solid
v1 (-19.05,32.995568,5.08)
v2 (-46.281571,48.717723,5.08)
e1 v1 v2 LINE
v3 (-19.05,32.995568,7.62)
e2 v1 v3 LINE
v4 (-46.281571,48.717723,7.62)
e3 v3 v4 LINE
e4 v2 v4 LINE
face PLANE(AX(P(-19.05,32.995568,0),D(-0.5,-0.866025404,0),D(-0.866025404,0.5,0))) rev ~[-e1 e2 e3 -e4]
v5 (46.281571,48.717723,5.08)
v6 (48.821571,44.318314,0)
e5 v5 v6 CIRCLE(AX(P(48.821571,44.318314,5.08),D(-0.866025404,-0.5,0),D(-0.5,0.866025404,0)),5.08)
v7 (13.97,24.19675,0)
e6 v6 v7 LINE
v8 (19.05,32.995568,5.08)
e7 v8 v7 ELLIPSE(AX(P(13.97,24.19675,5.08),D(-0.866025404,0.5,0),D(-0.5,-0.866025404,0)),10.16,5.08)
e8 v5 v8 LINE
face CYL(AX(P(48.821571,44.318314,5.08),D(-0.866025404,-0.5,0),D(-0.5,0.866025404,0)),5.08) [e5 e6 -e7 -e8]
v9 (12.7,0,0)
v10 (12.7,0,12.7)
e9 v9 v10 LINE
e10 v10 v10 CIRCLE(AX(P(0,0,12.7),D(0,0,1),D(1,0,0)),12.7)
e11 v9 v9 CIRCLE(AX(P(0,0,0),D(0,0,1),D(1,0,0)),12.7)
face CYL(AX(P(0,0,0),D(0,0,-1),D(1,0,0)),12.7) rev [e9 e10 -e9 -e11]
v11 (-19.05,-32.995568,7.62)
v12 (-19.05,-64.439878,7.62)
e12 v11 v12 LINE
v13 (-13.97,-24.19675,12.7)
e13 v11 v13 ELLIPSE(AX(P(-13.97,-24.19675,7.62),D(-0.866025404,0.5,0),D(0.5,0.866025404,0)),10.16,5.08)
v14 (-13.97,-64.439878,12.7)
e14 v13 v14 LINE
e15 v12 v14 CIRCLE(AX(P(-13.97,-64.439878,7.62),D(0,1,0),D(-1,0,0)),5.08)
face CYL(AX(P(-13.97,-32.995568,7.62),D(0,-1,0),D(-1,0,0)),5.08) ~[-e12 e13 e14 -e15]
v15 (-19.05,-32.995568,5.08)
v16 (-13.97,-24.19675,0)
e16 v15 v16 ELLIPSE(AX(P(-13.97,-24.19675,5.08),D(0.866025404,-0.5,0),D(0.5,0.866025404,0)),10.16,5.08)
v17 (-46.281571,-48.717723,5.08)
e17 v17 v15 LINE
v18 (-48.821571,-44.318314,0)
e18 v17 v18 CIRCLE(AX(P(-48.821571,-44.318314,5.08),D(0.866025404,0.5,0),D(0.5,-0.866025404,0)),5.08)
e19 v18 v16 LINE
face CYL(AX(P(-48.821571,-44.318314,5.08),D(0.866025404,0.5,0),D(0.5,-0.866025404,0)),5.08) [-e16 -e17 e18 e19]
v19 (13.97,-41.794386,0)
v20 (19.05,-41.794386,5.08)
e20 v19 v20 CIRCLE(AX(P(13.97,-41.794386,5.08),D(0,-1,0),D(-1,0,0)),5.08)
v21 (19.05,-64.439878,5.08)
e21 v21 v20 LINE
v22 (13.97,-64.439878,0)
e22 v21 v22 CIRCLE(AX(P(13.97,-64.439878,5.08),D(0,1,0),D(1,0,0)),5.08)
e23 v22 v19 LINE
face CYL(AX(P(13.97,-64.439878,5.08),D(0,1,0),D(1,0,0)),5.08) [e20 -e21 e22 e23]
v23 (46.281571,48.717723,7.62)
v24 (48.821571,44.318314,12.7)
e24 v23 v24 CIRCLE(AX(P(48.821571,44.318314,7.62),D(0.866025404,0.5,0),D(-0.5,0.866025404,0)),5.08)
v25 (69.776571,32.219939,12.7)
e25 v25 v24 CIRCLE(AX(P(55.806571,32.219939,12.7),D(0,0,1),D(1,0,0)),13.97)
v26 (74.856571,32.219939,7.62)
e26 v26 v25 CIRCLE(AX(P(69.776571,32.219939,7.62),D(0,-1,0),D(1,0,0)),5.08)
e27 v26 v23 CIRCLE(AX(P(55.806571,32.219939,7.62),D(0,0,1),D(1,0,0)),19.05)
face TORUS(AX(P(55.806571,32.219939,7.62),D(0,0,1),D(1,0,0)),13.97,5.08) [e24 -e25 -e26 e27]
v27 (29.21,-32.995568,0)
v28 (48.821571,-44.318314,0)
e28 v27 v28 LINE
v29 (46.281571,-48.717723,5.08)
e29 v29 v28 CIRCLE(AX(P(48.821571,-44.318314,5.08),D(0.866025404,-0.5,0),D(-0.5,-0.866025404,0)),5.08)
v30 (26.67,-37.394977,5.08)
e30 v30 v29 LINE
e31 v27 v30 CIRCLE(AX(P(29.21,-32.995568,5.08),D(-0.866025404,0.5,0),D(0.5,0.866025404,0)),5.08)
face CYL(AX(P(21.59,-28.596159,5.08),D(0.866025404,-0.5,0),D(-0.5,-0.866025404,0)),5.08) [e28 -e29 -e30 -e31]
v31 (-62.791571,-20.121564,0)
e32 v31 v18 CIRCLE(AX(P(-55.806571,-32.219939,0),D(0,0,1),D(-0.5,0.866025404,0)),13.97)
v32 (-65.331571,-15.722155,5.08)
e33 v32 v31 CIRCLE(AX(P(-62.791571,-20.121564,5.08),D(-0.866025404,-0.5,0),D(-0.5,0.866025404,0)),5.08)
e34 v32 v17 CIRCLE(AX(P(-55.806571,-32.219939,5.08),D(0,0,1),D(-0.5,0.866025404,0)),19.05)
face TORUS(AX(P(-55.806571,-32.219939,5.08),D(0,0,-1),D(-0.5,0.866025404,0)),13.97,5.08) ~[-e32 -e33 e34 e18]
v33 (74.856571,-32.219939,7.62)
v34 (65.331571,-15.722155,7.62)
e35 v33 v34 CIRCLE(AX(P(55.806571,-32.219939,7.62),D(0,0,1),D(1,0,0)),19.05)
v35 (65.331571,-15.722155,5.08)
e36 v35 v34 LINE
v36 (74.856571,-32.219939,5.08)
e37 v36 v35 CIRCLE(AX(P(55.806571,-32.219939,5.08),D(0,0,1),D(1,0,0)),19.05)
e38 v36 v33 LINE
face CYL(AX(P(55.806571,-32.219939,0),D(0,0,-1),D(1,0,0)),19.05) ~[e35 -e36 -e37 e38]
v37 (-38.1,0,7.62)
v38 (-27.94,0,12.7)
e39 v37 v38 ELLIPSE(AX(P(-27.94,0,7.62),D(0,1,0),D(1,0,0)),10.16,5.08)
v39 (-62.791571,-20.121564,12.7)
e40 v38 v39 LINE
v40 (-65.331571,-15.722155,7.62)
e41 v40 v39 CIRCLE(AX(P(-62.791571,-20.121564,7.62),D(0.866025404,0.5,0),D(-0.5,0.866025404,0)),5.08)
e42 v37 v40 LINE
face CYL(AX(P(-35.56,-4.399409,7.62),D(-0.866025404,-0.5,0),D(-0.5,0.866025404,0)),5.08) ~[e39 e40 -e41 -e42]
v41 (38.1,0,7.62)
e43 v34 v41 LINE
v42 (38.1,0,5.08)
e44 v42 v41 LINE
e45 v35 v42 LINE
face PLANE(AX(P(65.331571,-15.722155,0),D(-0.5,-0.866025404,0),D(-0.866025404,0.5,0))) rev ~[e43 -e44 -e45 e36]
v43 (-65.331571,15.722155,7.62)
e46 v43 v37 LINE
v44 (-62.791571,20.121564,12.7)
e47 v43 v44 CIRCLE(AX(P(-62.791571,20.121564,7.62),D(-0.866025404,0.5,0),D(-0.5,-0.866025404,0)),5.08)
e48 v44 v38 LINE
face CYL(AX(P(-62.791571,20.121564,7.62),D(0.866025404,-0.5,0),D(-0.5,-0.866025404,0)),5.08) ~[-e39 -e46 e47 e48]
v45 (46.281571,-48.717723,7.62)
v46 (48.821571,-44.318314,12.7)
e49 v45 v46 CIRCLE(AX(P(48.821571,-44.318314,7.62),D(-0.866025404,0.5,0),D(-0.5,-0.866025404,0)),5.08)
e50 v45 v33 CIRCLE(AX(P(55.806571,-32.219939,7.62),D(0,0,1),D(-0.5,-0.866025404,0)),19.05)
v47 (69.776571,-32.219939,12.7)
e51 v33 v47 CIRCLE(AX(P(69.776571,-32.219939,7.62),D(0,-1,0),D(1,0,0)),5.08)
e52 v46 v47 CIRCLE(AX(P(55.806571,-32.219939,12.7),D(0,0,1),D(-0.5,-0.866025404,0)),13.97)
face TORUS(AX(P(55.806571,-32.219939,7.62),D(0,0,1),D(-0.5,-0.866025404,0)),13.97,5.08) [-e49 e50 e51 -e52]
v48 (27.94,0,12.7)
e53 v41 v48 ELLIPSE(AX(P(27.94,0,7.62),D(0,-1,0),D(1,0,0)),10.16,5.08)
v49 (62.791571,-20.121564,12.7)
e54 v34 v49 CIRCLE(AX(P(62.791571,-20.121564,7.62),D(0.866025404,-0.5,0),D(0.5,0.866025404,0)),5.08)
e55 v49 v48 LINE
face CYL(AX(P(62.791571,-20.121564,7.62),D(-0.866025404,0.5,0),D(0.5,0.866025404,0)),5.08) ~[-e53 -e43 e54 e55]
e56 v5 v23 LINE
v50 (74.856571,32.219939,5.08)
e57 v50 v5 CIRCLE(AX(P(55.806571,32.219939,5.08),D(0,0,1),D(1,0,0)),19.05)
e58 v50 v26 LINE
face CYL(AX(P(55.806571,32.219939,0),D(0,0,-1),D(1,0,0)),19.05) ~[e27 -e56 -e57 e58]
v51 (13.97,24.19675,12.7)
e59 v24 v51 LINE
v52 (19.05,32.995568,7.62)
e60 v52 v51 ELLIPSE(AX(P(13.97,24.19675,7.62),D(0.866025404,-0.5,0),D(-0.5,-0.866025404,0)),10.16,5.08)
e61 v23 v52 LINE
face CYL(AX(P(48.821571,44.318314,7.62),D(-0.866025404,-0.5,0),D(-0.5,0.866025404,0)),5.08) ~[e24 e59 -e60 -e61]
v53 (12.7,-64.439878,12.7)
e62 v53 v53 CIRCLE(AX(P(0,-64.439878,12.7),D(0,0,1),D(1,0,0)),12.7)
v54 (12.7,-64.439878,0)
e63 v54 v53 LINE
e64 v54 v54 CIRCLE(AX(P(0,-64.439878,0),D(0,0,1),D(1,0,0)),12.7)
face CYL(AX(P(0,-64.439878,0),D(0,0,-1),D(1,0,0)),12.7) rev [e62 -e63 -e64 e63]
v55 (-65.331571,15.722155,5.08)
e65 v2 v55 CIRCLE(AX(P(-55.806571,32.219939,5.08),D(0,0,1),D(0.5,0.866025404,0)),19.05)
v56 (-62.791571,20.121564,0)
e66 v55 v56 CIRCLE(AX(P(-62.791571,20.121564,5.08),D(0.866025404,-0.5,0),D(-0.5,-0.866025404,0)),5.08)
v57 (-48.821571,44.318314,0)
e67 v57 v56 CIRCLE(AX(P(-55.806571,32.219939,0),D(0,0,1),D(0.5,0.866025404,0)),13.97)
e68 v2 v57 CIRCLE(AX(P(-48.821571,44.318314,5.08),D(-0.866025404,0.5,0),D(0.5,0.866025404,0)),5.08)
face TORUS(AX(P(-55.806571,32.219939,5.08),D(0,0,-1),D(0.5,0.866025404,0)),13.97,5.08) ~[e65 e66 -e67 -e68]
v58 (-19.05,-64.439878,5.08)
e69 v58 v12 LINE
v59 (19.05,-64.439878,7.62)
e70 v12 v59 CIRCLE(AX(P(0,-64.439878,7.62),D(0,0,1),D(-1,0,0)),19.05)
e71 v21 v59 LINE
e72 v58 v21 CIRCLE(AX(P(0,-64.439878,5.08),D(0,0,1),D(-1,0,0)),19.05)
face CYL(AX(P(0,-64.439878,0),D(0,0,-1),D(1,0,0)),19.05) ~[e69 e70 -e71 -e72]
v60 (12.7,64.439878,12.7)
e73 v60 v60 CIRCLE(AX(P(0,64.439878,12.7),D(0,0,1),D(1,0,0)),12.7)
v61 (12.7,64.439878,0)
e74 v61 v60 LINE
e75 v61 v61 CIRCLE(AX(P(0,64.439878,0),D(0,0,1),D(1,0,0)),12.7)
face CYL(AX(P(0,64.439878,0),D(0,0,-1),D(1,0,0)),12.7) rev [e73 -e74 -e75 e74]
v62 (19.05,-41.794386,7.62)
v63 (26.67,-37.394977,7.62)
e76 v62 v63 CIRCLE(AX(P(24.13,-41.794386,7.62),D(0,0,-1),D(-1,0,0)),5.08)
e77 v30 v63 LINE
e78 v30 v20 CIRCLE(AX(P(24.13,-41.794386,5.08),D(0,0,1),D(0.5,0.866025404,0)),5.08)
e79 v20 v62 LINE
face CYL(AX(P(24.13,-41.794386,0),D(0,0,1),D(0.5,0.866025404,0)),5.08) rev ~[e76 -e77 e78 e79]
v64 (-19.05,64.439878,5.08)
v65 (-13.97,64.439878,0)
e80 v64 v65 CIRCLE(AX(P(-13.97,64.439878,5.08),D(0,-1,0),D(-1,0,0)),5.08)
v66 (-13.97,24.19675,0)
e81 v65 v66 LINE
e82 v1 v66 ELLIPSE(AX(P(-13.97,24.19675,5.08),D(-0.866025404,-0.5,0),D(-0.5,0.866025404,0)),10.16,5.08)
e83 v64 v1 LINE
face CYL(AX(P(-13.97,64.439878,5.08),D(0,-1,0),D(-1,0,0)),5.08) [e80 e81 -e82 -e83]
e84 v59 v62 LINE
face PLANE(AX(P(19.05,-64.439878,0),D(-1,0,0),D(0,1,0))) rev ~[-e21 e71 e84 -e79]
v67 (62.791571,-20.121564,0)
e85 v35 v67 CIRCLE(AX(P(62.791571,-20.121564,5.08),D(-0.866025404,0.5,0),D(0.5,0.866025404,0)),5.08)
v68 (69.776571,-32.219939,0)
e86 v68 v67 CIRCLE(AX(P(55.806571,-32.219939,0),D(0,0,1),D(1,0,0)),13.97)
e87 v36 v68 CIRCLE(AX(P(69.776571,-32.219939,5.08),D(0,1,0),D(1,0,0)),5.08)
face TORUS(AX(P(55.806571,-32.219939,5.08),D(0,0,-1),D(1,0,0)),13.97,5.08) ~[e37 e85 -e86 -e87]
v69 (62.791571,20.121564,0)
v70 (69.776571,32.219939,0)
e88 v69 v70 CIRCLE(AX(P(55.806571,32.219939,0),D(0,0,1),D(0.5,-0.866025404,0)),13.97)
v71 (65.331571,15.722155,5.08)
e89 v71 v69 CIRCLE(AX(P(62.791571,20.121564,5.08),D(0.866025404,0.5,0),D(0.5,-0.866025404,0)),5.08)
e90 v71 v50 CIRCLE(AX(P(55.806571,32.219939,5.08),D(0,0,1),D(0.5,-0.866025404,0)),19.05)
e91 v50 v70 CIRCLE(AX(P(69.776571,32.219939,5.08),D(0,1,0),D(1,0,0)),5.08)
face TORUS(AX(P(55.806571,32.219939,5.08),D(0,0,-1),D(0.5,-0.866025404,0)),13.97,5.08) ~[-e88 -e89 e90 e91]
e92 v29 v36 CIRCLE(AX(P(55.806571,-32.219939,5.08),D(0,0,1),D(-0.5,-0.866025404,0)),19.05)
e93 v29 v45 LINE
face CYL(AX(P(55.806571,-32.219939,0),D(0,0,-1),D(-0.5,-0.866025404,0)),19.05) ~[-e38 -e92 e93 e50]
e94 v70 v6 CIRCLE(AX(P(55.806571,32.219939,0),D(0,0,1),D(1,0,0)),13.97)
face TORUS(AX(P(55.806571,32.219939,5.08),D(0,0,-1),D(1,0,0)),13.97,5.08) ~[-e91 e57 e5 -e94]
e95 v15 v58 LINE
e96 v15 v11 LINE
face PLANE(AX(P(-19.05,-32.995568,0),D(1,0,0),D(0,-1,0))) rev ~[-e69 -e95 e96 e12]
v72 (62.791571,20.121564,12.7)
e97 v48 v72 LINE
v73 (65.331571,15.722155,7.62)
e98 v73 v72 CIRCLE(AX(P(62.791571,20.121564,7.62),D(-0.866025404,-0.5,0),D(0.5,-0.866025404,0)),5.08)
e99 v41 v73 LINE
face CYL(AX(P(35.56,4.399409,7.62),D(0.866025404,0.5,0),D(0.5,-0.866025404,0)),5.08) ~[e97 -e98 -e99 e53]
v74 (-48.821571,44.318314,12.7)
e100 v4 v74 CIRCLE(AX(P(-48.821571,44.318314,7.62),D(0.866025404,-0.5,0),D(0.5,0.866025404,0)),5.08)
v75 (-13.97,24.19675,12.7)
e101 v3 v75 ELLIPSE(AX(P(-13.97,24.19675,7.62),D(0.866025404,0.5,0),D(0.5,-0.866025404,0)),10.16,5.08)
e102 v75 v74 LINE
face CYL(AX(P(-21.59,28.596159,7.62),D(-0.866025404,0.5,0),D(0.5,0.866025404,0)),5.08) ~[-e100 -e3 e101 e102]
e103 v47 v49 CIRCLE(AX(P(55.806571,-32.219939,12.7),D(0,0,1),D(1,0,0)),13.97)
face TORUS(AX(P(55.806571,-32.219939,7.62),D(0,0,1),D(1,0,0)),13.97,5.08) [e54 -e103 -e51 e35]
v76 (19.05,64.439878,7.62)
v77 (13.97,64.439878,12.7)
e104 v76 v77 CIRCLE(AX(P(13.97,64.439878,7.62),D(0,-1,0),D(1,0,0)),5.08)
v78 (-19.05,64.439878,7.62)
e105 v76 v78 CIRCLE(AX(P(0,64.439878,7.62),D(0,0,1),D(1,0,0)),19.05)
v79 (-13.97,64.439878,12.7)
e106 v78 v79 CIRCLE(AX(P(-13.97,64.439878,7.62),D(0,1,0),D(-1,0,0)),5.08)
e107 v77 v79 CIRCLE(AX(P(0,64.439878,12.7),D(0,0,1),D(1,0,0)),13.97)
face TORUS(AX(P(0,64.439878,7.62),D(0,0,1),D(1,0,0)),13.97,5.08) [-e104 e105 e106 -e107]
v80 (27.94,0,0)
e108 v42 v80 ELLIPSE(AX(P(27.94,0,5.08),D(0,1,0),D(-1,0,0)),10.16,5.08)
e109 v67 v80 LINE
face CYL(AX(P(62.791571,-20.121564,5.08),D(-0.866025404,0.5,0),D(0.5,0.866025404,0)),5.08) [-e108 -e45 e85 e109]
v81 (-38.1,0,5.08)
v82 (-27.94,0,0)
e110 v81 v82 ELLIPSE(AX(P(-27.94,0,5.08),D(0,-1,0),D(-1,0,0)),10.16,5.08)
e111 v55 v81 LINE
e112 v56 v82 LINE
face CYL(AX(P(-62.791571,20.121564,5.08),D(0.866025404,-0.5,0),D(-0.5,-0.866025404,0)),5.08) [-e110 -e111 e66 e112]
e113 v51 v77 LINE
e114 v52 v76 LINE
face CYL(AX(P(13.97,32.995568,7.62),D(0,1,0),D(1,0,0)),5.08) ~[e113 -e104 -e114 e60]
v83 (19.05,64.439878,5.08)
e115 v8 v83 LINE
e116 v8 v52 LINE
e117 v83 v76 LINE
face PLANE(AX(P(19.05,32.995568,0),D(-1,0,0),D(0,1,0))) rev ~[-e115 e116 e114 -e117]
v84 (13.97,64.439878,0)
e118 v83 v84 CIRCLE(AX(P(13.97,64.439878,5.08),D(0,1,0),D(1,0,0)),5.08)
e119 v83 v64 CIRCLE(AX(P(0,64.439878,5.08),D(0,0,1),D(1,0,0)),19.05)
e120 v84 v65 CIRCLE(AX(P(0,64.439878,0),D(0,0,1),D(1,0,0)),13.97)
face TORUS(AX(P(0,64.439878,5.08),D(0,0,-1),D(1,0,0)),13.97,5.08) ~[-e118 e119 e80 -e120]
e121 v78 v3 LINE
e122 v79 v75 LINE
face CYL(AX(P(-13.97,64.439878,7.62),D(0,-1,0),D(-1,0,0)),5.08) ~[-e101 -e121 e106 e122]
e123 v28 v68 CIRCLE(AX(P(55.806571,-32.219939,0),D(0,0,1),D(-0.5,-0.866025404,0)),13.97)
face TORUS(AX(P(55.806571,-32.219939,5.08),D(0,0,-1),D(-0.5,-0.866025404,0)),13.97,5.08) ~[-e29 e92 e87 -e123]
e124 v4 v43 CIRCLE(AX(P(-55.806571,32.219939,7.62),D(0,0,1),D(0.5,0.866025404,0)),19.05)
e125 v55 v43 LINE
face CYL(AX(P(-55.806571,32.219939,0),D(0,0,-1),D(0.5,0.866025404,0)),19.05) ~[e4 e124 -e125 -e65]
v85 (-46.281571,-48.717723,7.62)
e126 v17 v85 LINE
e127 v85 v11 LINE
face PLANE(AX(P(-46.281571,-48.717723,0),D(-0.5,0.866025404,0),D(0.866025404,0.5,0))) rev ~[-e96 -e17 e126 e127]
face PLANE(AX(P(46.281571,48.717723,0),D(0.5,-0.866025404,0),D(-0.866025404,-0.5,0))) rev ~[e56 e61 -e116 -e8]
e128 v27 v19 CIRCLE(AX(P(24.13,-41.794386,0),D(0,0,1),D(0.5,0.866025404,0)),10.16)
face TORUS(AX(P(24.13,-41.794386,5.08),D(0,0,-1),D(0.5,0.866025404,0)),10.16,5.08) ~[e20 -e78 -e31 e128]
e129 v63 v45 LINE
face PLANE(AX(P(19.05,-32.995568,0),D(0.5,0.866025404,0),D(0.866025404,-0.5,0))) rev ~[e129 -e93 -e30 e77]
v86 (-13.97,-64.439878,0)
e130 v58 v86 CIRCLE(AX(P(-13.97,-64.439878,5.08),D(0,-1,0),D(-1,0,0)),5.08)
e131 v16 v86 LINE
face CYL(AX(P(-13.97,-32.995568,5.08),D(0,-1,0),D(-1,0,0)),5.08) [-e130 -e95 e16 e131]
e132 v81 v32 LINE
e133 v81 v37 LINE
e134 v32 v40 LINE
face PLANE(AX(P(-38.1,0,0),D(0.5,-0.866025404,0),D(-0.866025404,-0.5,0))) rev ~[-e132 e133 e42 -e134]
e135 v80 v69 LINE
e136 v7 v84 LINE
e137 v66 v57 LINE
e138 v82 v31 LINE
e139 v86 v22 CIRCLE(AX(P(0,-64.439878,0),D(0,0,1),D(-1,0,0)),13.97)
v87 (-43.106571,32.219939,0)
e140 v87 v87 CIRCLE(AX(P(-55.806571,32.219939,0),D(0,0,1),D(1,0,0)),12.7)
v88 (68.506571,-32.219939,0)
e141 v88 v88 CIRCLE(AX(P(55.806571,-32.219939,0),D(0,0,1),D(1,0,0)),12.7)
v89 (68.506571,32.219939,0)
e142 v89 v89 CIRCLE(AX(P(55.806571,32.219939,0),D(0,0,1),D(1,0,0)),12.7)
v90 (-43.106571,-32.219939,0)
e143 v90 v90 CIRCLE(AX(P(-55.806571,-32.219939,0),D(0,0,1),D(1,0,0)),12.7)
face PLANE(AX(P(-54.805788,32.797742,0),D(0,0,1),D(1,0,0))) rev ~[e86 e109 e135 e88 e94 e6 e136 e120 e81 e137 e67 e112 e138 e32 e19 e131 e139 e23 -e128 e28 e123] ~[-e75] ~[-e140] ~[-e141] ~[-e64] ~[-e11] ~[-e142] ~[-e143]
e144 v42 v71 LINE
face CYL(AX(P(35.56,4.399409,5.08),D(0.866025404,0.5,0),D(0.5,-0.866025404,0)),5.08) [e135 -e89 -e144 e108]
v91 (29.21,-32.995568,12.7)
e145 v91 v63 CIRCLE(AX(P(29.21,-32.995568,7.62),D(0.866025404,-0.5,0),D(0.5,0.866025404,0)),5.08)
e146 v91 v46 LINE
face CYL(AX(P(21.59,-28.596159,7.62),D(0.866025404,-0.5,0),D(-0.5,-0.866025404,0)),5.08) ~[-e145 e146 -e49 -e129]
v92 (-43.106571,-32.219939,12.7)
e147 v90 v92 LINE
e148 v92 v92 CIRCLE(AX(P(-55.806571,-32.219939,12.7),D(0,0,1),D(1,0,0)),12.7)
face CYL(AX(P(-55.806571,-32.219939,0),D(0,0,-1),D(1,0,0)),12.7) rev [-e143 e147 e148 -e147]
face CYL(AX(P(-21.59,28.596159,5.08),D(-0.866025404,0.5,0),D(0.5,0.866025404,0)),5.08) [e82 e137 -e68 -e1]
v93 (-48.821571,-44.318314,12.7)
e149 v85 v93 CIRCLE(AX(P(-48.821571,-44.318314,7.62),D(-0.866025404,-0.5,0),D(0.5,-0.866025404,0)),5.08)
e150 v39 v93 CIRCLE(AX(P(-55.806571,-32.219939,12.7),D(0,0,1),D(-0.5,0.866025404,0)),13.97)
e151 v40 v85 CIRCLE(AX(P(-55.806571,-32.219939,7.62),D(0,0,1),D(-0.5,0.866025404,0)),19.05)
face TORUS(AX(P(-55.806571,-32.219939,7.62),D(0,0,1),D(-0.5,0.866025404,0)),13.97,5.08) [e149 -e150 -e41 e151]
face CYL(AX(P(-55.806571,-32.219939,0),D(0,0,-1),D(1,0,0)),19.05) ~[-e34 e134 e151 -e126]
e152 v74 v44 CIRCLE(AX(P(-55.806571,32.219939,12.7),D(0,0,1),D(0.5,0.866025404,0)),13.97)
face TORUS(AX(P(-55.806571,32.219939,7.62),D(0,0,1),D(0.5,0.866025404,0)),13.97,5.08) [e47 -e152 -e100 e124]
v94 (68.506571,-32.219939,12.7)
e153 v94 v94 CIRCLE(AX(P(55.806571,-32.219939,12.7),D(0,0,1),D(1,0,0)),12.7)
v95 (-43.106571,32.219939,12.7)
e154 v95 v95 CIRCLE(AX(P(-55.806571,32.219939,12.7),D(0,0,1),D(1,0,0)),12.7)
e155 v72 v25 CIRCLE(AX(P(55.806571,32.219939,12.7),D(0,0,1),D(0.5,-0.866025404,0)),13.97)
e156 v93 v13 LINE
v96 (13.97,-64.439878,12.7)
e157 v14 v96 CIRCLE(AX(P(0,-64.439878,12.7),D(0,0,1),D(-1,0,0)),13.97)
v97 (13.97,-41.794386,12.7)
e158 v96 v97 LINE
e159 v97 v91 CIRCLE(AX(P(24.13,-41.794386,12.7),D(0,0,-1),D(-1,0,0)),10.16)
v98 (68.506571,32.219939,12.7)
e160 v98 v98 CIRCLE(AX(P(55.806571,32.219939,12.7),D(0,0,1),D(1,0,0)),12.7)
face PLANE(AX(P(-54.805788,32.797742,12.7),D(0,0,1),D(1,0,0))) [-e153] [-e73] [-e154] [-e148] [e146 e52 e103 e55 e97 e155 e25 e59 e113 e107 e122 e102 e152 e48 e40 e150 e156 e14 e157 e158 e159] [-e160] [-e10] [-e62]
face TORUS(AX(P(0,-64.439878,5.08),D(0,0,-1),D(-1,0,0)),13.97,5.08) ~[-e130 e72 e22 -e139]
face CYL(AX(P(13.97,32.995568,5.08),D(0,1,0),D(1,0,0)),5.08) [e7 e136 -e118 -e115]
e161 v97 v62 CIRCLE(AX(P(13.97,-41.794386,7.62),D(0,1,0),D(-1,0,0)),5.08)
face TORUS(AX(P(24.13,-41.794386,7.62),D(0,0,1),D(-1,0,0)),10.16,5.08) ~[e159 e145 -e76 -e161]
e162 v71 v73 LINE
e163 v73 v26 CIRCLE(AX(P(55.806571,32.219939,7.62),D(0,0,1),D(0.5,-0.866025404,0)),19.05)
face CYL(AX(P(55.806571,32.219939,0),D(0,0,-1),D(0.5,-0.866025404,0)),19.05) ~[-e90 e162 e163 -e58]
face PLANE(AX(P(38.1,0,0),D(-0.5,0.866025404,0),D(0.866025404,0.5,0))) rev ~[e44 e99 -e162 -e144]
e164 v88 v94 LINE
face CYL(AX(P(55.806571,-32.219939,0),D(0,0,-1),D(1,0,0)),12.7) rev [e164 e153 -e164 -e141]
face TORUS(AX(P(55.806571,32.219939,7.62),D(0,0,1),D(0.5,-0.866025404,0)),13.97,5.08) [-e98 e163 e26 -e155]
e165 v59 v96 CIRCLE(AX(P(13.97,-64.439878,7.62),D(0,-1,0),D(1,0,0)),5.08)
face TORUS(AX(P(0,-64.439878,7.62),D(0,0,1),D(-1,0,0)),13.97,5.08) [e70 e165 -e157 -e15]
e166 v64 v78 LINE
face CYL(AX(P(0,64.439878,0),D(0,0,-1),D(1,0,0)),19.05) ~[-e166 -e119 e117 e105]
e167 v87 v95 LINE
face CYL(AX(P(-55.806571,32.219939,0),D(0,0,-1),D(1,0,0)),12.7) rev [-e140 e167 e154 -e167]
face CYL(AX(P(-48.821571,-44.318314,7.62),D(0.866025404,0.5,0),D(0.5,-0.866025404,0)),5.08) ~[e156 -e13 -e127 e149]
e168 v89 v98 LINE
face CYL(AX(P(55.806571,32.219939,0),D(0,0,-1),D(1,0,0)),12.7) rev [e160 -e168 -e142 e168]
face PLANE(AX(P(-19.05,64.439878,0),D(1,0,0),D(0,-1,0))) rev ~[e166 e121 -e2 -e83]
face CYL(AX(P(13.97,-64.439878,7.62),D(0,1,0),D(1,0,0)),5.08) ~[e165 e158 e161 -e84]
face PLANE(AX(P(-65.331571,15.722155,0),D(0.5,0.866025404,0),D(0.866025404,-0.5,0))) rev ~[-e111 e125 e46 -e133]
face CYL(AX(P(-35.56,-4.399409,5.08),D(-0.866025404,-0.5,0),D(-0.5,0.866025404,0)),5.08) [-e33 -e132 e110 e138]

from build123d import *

# Parameters (mm, degrees)
F0_R     = 12.7
F1_DEPTH = 12.7
F2_R     = 5.08


with BuildPart() as f1:
    # F0 (on Top) → F1 (new body)
    with BuildSketch(Plane.XY):
        with BuildLine():
            ThreePointArc((-36.7565712502, 32.2199389338), (-39.3087873081, 41.7449389338), (-46.2815712502, 48.7177228759))
            ThreePointArc((-46.2815712502, 48.7177228759), (-72.3043551923, 41.7449389338), (-65.3315712502, 15.7221549918))
            ThreePointArc((-65.3315712502, 15.7221549918), (-46.2815712502, 15.7221549918), (-36.7565712502, 32.2199389338))
        make_face()
        with Locations((-55.8065712502, 32.2199389338)):
            Circle(F0_R, mode=Mode.SUBTRACT)
        with BuildLine():
            Line((-38.1, 0), (-19.05, 10.9985226281))
            Line((-19.05, 10.9985226281), (-19.05, 32.9955678842))
            Line((-19.05, 32.9955678842), (-46.2815712502, 48.7177228759))
            ThreePointArc((-46.2815712502, 48.7177228759), (-39.3087873081, 41.7449389338), (-36.7565712502, 32.2199389338))
            ThreePointArc((-36.7565712502, 32.2199389338), (-46.2815712502, 15.7221549918), (-65.3315712502, 15.7221549918))
            Line((-65.3315712502, 15.7221549918), (-38.1, 0))
        make_face()
        Polygon((-19.05, 10.9985226281), (-9.525, 16.4977839421), (0, 21.9970452561), (-19.05, 32.9955678842), align=None)
        with BuildLine():
            Line((-19.05, 32.9955678842), (0, 21.9970452561))
            Line((0, 21.9970452561), (19.05, 32.9955678842))
            Line((19.05, 32.9955678842), (19.05, 64.4398778677))
            ThreePointArc((19.05, 64.4398778677), (0, 45.3898778677), (-19.05, 64.4398778677))
            Line((-19.05, 64.4398778677), (-19.05, 32.9955678842))
        make_face()
        with BuildLine():
            ThreePointArc((-19.05, 64.4398778677), (0, 45.3898778677), (19.05, 64.4398778677))
            ThreePointArc((19.05, 64.4398778677), (0, 83.4898778677), (-19.05, 64.4398778677))
        make_face()
        with Locations((0, 64.4398778677)):
            Circle(F0_R, mode=Mode.SUBTRACT)
        with BuildLine():
            Line((19.05, 32.9955678842), (19.05, 10.9985226281))
            Line((19.05, 10.9985226281), (38.1, 0))
            Line((38.1, 0), (65.3315712502, 15.7221549918))
            ThreePointArc((65.3315712502, 15.7221549918), (39.3087873081, 22.6949389338), (46.2815712502, 48.7177228759))
            Line((46.2815712502, 48.7177228759), (19.05, 32.9955678842))
        make_face()
        with BuildLine():
            ThreePointArc((74.8565712502, 32.2199389338), (65.3315712502, 48.7177228759), (46.2815712502, 48.7177228759))
            ThreePointArc((46.2815712502, 48.7177228759), (39.3087873081, 22.6949389338), (65.3315712502, 15.7221549918))
            ThreePointArc((65.3315712502, 15.7221549918), (72.3043551923, 22.6949389338), (74.8565712502, 32.2199389338))
        make_face()
        with Locations((55.8065712502, 32.2199389338)):
            Circle(F0_R, mode=Mode.SUBTRACT)
        Polygon((0, 21.9970452561), (9.525, 16.4977839421), (19.05, 10.9985226281), (19.05, 32.9955678842), align=None)
        with BuildLine():
            ThreePointArc((9.525, 16.4977839421), (16.4977839421, 9.525), (19.05, 0))
            Line((19.05, 0), (19.05, 10.9985226281))
            Line((19.05, 10.9985226281), (9.525, 16.4977839421))
        make_face()
        with BuildLine():
            ThreePointArc((-9.525, 16.4977839421), (0, 19.05), (9.525, 16.4977839421))
            Line((9.525, 16.4977839421), (0, 21.9970452561))
            Line((0, 21.9970452561), (-9.525, 16.4977839421))
        make_face()
        with BuildLine():
            ThreePointArc((-19.05, 0), (-16.4977839421, 9.525), (-9.525, 16.4977839421))
            Line((-9.525, 16.4977839421), (-19.05, 10.9985226281))
            Line((-19.05, 10.9985226281), (-19.05, 0))
        make_face()
        with BuildLine():
            ThreePointArc((9.525, -16.4977839421), (16.4977839421, -9.525), (19.05, 0))
            ThreePointArc((19.05, 0), (16.4977839421, 9.525), (9.525, 16.4977839421))
            ThreePointArc((9.525, 16.4977839421), (0, 19.05), (-9.525, 16.4977839421))
            ThreePointArc((-9.525, 16.4977839421), (-16.4977839421, 9.525), (-19.05, 0))
            ThreePointArc((-19.05, 0), (-16.4977839421, -9.525), (-9.525, -16.4977839421))
            ThreePointArc((-9.525, -16.4977839421), (0, -19.05), (9.525, -16.4977839421))
        make_face()
        Circle(F0_R, mode=Mode.SUBTRACT)
        with BuildLine():
            Line((-19.05, -10.9985226281), (-9.525, -16.4977839421))
            ThreePointArc((-9.525, -16.4977839421), (-16.4977839421, -9.525), (-19.05, 0))
            Line((-19.05, 0), (-19.05, -10.9985226281))
        make_face()
        Polygon((-19.05, -10.9985226281), (-19.05, 0), (-19.05, 10.9985226281), (-38.1, 0), align=None)
        with BuildLine():
            Line((-19.05, -32.9955678842), (-19.05, -10.9985226281))
            Line((-19.05, -10.9985226281), (-38.1, 0))
            Line((-38.1, 0), (-65.3315712502, -15.7221549918))
            ThreePointArc((-65.3315712502, -15.7221549918), (-46.2815712502, -15.7221549918), (-36.7565712502, -32.2199389338))
            ThreePointArc((-36.7565712502, -32.2199389338), (-39.3087873081, -41.7449389338), (-46.2815712502, -48.7177228759))
            Line((-46.2815712502, -48.7177228759), (-19.05, -32.9955678842))
        make_face()
        Polygon((0, -21.9970452561), (-9.525, -16.4977839421), (-19.05, -10.9985226281), (-19.05, -32.9955678842), align=None)
        with BuildLine():
            Line((19.05, -32.9955678842), (0, -21.9970452561))
            Line((0, -21.9970452561), (-19.05, -32.9955678842))
            Line((-19.05, -32.9955678842), (-19.05, -64.4398778677))
            ThreePointArc((-19.05, -64.4398778677), (0, -45.3898778677), (19.05, -64.4398778677))
            Line((19.05, -64.4398778677), (19.05, -32.9955678842))
        make_face()
        Polygon((19.05, -10.9985226281), (9.525, -16.4977839421), (0, -21.9970452561), (19.05, -32.9955678842), align=None)
        with BuildLine():
            Line((38.1, 0), (19.05, -10.9985226281))
            Line((19.05, -10.9985226281), (19.05, -32.9955678842))
            Line((19.05, -32.9955678842), (46.2815712502, -48.7177228759))
            ThreePointArc((46.2815712502, -48.7177228759), (39.3087873081, -22.6949389338), (65.3315712502, -15.7221549918))
            Line((65.3315712502, -15.7221549918), (38.1, 0))
        make_face()
        Polygon((19.05, 10.9985226281), (19.05, 0), (19.05, -10.9985226281), (38.1, 0), align=None)
        with BuildLine():
            Line((19.05, -10.9985226281), (19.05, 0))
            ThreePointArc((19.05, 0), (16.4977839421, -9.525), (9.525, -16.4977839421))
            Line((9.525, -16.4977839421), (19.05, -10.9985226281))
        make_face()
        with BuildLine():
            Line((0, -21.9970452561), (9.525, -16.4977839421))
            ThreePointArc((9.525, -16.4977839421), (0, -19.05), (-9.525, -16.4977839421))
            Line((-9.525, -16.4977839421), (0, -21.9970452561))
        make_face()
        with BuildLine():
            ThreePointArc((-65.3315712502, -15.7221549918), (-72.3043551923, -41.7449389338), (-46.2815712502, -48.7177228759))
            ThreePointArc((-46.2815712502, -48.7177228759), (-39.3087873081, -41.7449389338), (-36.7565712502, -32.2199389338))
            ThreePointArc((-36.7565712502, -32.2199389338), (-46.2815712502, -15.7221549918), (-65.3315712502, -15.7221549918))
        make_face()
        with Locations((-55.8065712502, -32.2199389338)):
            Circle(F0_R, mode=Mode.SUBTRACT)
        with BuildLine():
            ThreePointArc((-19.05, -64.4398778677), (0, -83.4898778677), (19.05, -64.4398778677))
            ThreePointArc((19.05, -64.4398778677), (0, -45.3898778677), (-19.05, -64.4398778677))
        make_face()
        with Locations((0, -64.4398778677)):
            Circle(F0_R, mode=Mode.SUBTRACT)
        with BuildLine():
            ThreePointArc((74.8565712502, -32.2199389338), (72.3043551923, -22.6949389338), (65.3315712502, -15.7221549918))
            ThreePointArc((65.3315712502, -15.7221549918), (39.3087873081, -22.6949389338), (46.2815712502, -48.7177228759))
            ThreePointArc((46.2815712502, -48.7177228759), (65.3315712502, -48.7177228759), (74.8565712502, -32.2199389338))
        make_face()
        with Locations((55.8065712502, -32.2199389338)):
            Circle(F0_R, mode=Mode.SUBTRACT)
    extrude(amount=F1_DEPTH)

    # F2
    f2_edges = [f1.edges().sort_by_distance(p)[0] for p in [
        (51.715786, 7.861077, 12.7),
        (19.05, 48.717723, 12.7),
        (-32.665786, 40.856645, 12.7),
        (-51.715786, -7.861077, 12.7),
        (-19.05, -48.717723, 12.7),
        (32.665786, -40.856645, 12.7),
        (19.05, -32.995568, 6.35),
        (46.281571, -48.717723, 6.35),
        (32.665786, -40.856645, 0),
        (-51.715786, -7.861077, 0),
        (32.665786, 40.856645, 0),
        (-51.715786, 7.861077, 0),
        (-19.05, 48.717723, 0),
        (-72.304355, 41.744939, 0),
        (-72.304355, 41.744939, 12.7),
        (-51.715786, 7.861077, 12.7),
        (-72.304355, -41.744939, 0),
        (-72.304355, -41.744939, 12.7),
        (-32.665786, -40.856645, 0),
        (-32.665786, -40.856645, 12.7),
        (-19.05, -48.717723, 0),
        (0, -83.489878, 0),
        (0, -83.489878, 12.7),
        (72.304355, -41.744939, 0),
        (72.304355, -41.744939, 12.7),
        (51.715786, -7.861077, 0),
        (51.715786, -7.861077, 12.7),
        (51.715786, 7.861077, 0),
        (72.304355, 41.744939, 0),
        (72.304355, 41.744939, 12.7),
        (32.665786, 40.856645, 12.7),
        (19.05, 48.717723, 0),
        (0, 83.489878, 0),
        (0, 83.489878, 12.7),
        (-19.05, 48.717723, 12.7),
        (-32.665786, 40.856645, 0),
    ]]
    fillet(f2_edges, radius=F2_R)


solid = f1.part
